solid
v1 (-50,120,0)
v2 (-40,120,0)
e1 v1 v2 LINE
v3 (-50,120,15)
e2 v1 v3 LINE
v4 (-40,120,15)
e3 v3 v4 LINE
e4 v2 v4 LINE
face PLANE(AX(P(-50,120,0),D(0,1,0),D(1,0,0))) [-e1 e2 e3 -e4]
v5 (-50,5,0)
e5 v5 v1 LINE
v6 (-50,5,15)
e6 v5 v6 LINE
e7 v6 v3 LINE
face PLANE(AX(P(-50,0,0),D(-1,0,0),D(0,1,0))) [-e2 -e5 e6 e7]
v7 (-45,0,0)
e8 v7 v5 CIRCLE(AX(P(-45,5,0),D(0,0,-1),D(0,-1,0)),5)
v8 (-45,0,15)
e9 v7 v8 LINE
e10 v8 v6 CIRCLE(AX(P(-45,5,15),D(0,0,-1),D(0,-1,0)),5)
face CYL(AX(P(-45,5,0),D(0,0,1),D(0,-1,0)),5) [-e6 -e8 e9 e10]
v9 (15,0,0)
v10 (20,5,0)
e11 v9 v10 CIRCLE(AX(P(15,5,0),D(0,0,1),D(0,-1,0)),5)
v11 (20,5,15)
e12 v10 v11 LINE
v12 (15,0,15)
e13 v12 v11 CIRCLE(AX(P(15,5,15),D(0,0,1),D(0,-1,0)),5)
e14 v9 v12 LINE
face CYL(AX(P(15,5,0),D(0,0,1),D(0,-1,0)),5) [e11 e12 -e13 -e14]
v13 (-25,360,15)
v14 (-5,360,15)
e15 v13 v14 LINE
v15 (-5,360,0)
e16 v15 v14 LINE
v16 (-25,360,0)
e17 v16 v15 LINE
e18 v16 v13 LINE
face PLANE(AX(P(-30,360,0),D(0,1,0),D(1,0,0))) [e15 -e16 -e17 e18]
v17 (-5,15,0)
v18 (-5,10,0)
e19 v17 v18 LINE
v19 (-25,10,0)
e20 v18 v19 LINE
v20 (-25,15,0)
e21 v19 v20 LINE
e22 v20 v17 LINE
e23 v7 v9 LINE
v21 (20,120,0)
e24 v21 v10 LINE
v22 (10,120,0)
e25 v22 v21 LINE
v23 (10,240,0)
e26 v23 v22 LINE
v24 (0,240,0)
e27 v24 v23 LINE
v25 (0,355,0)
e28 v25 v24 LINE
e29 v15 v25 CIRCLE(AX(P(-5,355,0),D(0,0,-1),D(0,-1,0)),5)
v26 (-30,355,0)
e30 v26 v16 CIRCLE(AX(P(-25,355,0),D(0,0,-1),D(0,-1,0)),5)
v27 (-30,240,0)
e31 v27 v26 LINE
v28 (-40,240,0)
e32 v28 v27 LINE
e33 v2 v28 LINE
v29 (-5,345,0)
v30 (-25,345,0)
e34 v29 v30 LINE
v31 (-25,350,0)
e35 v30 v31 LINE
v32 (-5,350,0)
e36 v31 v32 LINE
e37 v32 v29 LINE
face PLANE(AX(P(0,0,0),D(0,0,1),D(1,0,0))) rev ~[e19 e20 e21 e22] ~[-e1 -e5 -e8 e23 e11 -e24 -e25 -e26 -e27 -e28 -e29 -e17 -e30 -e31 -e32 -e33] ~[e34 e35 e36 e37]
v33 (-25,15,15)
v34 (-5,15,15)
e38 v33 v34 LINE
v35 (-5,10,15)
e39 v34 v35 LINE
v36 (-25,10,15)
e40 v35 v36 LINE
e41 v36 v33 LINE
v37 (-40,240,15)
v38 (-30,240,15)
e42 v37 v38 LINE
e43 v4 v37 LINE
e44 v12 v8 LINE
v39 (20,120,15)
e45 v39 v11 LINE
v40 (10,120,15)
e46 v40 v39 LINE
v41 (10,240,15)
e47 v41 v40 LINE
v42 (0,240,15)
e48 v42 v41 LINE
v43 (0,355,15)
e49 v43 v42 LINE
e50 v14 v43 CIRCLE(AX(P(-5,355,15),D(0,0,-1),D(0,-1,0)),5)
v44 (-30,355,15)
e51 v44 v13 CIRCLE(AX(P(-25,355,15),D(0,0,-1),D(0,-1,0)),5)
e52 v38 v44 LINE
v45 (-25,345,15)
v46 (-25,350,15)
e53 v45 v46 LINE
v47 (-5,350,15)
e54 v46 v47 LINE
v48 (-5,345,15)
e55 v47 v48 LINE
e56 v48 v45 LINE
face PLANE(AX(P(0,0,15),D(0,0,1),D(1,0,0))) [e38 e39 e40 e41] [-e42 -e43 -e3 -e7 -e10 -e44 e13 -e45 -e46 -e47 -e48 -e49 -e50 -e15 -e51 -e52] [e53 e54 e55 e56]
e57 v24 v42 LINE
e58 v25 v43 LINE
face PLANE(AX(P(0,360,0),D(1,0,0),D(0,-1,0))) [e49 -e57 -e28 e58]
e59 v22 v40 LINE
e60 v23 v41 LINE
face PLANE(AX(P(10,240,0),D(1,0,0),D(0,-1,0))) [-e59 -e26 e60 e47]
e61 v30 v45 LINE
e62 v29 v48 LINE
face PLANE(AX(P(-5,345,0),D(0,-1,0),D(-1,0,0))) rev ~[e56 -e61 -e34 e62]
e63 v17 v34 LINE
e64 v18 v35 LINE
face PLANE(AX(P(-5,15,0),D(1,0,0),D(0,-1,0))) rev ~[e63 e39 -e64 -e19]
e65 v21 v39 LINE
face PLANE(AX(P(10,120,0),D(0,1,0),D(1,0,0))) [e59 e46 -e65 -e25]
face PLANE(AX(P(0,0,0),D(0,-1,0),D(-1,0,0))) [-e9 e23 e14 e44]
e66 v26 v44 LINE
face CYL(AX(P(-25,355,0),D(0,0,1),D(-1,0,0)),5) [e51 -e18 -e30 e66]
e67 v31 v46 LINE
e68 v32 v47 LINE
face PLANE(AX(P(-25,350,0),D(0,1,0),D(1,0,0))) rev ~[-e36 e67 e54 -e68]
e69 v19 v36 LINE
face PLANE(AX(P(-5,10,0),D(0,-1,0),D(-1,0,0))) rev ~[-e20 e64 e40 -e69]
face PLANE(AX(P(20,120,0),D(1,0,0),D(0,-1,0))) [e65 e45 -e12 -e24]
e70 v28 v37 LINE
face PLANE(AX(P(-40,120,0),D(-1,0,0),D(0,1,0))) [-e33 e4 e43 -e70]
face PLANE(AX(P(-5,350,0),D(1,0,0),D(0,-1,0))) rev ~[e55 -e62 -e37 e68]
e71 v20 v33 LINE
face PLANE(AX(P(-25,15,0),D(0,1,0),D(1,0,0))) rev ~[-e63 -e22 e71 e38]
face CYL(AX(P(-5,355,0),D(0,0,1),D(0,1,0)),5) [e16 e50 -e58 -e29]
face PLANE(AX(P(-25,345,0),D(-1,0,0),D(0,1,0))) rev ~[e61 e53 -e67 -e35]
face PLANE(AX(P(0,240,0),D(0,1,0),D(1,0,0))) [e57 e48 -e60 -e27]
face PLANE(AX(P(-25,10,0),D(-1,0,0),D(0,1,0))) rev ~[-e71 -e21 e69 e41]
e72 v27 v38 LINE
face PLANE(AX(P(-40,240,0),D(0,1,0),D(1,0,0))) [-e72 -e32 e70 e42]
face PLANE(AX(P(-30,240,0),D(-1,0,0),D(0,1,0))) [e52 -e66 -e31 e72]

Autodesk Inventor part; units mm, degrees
ref_plane "YZ Plane" through (0, 0, 0) normal (1, 0, 0) x (0, 1, 0)
ref_plane "XZ Plane" through (0, 0, 0) normal (0, 1, 0) x (-1, 0, 0)
ref_plane "XY Plane" through (0, 0, 0) normal (0, 0, 1) x (1, 0, 0)
sketch "Sketch1" plane through (0, 0, 0) normal (0, 0, 1) x (1, 0, 0)
  line L0 (0, 0) -> (-30, 0)
  line L1 (-30, 0) -> (-30, 360)
  line L2 (-30, 360) -> (0, 360)
  line L3 (0, 360) -> (0, 0)
  line L4 (-40, 240) -> (10, 240)
  line L5 (10, 240) -> (10, 0)
  line L6 (10, 0) -> (-40, 0)
  line L7 (-40, 0) -> (-40, 240)
  line L8 (-50, 120) -> (20, 120)
  line L9 (20, 120) -> (20, 0)
  line L10 (20, 0) -> (-50, 0)
  line L11 (-50, 0) -> (-50, 120)
  line L12 (-5, 10) -> (-25, 10)
  line L13 (-25, 10) -> (-25, 15)
  line L14 (-25, 15) -> (-5, 15)
  line L15 (-5, 15) -> (-5, 10)
  line L16 (-25, 350) -> (-5, 350)
  line L17 (-5, 350) -> (-5, 345)
  line L18 (-5, 345) -> (-25, 345)
  line L19 (-25, 345) -> (-25, 350)
  dimension "d0" = 30
  dimension "d1" = 360
  dimension "d2" = 50
  dimension "d3" = 70
  dimension "d4" = 20
  dimension "d5" = 5
  dimension "d6" = 5
extrude "Extrusion1" add sketch "Sketch1" along normal blind 15
fillet "Fillet1" radius 5 4 edges at (-50, 0, 7.5) (20, 0, 7.5) (-30, 360, 7.5) (0, 360, 7.5)
properties part number "TENSOR"
